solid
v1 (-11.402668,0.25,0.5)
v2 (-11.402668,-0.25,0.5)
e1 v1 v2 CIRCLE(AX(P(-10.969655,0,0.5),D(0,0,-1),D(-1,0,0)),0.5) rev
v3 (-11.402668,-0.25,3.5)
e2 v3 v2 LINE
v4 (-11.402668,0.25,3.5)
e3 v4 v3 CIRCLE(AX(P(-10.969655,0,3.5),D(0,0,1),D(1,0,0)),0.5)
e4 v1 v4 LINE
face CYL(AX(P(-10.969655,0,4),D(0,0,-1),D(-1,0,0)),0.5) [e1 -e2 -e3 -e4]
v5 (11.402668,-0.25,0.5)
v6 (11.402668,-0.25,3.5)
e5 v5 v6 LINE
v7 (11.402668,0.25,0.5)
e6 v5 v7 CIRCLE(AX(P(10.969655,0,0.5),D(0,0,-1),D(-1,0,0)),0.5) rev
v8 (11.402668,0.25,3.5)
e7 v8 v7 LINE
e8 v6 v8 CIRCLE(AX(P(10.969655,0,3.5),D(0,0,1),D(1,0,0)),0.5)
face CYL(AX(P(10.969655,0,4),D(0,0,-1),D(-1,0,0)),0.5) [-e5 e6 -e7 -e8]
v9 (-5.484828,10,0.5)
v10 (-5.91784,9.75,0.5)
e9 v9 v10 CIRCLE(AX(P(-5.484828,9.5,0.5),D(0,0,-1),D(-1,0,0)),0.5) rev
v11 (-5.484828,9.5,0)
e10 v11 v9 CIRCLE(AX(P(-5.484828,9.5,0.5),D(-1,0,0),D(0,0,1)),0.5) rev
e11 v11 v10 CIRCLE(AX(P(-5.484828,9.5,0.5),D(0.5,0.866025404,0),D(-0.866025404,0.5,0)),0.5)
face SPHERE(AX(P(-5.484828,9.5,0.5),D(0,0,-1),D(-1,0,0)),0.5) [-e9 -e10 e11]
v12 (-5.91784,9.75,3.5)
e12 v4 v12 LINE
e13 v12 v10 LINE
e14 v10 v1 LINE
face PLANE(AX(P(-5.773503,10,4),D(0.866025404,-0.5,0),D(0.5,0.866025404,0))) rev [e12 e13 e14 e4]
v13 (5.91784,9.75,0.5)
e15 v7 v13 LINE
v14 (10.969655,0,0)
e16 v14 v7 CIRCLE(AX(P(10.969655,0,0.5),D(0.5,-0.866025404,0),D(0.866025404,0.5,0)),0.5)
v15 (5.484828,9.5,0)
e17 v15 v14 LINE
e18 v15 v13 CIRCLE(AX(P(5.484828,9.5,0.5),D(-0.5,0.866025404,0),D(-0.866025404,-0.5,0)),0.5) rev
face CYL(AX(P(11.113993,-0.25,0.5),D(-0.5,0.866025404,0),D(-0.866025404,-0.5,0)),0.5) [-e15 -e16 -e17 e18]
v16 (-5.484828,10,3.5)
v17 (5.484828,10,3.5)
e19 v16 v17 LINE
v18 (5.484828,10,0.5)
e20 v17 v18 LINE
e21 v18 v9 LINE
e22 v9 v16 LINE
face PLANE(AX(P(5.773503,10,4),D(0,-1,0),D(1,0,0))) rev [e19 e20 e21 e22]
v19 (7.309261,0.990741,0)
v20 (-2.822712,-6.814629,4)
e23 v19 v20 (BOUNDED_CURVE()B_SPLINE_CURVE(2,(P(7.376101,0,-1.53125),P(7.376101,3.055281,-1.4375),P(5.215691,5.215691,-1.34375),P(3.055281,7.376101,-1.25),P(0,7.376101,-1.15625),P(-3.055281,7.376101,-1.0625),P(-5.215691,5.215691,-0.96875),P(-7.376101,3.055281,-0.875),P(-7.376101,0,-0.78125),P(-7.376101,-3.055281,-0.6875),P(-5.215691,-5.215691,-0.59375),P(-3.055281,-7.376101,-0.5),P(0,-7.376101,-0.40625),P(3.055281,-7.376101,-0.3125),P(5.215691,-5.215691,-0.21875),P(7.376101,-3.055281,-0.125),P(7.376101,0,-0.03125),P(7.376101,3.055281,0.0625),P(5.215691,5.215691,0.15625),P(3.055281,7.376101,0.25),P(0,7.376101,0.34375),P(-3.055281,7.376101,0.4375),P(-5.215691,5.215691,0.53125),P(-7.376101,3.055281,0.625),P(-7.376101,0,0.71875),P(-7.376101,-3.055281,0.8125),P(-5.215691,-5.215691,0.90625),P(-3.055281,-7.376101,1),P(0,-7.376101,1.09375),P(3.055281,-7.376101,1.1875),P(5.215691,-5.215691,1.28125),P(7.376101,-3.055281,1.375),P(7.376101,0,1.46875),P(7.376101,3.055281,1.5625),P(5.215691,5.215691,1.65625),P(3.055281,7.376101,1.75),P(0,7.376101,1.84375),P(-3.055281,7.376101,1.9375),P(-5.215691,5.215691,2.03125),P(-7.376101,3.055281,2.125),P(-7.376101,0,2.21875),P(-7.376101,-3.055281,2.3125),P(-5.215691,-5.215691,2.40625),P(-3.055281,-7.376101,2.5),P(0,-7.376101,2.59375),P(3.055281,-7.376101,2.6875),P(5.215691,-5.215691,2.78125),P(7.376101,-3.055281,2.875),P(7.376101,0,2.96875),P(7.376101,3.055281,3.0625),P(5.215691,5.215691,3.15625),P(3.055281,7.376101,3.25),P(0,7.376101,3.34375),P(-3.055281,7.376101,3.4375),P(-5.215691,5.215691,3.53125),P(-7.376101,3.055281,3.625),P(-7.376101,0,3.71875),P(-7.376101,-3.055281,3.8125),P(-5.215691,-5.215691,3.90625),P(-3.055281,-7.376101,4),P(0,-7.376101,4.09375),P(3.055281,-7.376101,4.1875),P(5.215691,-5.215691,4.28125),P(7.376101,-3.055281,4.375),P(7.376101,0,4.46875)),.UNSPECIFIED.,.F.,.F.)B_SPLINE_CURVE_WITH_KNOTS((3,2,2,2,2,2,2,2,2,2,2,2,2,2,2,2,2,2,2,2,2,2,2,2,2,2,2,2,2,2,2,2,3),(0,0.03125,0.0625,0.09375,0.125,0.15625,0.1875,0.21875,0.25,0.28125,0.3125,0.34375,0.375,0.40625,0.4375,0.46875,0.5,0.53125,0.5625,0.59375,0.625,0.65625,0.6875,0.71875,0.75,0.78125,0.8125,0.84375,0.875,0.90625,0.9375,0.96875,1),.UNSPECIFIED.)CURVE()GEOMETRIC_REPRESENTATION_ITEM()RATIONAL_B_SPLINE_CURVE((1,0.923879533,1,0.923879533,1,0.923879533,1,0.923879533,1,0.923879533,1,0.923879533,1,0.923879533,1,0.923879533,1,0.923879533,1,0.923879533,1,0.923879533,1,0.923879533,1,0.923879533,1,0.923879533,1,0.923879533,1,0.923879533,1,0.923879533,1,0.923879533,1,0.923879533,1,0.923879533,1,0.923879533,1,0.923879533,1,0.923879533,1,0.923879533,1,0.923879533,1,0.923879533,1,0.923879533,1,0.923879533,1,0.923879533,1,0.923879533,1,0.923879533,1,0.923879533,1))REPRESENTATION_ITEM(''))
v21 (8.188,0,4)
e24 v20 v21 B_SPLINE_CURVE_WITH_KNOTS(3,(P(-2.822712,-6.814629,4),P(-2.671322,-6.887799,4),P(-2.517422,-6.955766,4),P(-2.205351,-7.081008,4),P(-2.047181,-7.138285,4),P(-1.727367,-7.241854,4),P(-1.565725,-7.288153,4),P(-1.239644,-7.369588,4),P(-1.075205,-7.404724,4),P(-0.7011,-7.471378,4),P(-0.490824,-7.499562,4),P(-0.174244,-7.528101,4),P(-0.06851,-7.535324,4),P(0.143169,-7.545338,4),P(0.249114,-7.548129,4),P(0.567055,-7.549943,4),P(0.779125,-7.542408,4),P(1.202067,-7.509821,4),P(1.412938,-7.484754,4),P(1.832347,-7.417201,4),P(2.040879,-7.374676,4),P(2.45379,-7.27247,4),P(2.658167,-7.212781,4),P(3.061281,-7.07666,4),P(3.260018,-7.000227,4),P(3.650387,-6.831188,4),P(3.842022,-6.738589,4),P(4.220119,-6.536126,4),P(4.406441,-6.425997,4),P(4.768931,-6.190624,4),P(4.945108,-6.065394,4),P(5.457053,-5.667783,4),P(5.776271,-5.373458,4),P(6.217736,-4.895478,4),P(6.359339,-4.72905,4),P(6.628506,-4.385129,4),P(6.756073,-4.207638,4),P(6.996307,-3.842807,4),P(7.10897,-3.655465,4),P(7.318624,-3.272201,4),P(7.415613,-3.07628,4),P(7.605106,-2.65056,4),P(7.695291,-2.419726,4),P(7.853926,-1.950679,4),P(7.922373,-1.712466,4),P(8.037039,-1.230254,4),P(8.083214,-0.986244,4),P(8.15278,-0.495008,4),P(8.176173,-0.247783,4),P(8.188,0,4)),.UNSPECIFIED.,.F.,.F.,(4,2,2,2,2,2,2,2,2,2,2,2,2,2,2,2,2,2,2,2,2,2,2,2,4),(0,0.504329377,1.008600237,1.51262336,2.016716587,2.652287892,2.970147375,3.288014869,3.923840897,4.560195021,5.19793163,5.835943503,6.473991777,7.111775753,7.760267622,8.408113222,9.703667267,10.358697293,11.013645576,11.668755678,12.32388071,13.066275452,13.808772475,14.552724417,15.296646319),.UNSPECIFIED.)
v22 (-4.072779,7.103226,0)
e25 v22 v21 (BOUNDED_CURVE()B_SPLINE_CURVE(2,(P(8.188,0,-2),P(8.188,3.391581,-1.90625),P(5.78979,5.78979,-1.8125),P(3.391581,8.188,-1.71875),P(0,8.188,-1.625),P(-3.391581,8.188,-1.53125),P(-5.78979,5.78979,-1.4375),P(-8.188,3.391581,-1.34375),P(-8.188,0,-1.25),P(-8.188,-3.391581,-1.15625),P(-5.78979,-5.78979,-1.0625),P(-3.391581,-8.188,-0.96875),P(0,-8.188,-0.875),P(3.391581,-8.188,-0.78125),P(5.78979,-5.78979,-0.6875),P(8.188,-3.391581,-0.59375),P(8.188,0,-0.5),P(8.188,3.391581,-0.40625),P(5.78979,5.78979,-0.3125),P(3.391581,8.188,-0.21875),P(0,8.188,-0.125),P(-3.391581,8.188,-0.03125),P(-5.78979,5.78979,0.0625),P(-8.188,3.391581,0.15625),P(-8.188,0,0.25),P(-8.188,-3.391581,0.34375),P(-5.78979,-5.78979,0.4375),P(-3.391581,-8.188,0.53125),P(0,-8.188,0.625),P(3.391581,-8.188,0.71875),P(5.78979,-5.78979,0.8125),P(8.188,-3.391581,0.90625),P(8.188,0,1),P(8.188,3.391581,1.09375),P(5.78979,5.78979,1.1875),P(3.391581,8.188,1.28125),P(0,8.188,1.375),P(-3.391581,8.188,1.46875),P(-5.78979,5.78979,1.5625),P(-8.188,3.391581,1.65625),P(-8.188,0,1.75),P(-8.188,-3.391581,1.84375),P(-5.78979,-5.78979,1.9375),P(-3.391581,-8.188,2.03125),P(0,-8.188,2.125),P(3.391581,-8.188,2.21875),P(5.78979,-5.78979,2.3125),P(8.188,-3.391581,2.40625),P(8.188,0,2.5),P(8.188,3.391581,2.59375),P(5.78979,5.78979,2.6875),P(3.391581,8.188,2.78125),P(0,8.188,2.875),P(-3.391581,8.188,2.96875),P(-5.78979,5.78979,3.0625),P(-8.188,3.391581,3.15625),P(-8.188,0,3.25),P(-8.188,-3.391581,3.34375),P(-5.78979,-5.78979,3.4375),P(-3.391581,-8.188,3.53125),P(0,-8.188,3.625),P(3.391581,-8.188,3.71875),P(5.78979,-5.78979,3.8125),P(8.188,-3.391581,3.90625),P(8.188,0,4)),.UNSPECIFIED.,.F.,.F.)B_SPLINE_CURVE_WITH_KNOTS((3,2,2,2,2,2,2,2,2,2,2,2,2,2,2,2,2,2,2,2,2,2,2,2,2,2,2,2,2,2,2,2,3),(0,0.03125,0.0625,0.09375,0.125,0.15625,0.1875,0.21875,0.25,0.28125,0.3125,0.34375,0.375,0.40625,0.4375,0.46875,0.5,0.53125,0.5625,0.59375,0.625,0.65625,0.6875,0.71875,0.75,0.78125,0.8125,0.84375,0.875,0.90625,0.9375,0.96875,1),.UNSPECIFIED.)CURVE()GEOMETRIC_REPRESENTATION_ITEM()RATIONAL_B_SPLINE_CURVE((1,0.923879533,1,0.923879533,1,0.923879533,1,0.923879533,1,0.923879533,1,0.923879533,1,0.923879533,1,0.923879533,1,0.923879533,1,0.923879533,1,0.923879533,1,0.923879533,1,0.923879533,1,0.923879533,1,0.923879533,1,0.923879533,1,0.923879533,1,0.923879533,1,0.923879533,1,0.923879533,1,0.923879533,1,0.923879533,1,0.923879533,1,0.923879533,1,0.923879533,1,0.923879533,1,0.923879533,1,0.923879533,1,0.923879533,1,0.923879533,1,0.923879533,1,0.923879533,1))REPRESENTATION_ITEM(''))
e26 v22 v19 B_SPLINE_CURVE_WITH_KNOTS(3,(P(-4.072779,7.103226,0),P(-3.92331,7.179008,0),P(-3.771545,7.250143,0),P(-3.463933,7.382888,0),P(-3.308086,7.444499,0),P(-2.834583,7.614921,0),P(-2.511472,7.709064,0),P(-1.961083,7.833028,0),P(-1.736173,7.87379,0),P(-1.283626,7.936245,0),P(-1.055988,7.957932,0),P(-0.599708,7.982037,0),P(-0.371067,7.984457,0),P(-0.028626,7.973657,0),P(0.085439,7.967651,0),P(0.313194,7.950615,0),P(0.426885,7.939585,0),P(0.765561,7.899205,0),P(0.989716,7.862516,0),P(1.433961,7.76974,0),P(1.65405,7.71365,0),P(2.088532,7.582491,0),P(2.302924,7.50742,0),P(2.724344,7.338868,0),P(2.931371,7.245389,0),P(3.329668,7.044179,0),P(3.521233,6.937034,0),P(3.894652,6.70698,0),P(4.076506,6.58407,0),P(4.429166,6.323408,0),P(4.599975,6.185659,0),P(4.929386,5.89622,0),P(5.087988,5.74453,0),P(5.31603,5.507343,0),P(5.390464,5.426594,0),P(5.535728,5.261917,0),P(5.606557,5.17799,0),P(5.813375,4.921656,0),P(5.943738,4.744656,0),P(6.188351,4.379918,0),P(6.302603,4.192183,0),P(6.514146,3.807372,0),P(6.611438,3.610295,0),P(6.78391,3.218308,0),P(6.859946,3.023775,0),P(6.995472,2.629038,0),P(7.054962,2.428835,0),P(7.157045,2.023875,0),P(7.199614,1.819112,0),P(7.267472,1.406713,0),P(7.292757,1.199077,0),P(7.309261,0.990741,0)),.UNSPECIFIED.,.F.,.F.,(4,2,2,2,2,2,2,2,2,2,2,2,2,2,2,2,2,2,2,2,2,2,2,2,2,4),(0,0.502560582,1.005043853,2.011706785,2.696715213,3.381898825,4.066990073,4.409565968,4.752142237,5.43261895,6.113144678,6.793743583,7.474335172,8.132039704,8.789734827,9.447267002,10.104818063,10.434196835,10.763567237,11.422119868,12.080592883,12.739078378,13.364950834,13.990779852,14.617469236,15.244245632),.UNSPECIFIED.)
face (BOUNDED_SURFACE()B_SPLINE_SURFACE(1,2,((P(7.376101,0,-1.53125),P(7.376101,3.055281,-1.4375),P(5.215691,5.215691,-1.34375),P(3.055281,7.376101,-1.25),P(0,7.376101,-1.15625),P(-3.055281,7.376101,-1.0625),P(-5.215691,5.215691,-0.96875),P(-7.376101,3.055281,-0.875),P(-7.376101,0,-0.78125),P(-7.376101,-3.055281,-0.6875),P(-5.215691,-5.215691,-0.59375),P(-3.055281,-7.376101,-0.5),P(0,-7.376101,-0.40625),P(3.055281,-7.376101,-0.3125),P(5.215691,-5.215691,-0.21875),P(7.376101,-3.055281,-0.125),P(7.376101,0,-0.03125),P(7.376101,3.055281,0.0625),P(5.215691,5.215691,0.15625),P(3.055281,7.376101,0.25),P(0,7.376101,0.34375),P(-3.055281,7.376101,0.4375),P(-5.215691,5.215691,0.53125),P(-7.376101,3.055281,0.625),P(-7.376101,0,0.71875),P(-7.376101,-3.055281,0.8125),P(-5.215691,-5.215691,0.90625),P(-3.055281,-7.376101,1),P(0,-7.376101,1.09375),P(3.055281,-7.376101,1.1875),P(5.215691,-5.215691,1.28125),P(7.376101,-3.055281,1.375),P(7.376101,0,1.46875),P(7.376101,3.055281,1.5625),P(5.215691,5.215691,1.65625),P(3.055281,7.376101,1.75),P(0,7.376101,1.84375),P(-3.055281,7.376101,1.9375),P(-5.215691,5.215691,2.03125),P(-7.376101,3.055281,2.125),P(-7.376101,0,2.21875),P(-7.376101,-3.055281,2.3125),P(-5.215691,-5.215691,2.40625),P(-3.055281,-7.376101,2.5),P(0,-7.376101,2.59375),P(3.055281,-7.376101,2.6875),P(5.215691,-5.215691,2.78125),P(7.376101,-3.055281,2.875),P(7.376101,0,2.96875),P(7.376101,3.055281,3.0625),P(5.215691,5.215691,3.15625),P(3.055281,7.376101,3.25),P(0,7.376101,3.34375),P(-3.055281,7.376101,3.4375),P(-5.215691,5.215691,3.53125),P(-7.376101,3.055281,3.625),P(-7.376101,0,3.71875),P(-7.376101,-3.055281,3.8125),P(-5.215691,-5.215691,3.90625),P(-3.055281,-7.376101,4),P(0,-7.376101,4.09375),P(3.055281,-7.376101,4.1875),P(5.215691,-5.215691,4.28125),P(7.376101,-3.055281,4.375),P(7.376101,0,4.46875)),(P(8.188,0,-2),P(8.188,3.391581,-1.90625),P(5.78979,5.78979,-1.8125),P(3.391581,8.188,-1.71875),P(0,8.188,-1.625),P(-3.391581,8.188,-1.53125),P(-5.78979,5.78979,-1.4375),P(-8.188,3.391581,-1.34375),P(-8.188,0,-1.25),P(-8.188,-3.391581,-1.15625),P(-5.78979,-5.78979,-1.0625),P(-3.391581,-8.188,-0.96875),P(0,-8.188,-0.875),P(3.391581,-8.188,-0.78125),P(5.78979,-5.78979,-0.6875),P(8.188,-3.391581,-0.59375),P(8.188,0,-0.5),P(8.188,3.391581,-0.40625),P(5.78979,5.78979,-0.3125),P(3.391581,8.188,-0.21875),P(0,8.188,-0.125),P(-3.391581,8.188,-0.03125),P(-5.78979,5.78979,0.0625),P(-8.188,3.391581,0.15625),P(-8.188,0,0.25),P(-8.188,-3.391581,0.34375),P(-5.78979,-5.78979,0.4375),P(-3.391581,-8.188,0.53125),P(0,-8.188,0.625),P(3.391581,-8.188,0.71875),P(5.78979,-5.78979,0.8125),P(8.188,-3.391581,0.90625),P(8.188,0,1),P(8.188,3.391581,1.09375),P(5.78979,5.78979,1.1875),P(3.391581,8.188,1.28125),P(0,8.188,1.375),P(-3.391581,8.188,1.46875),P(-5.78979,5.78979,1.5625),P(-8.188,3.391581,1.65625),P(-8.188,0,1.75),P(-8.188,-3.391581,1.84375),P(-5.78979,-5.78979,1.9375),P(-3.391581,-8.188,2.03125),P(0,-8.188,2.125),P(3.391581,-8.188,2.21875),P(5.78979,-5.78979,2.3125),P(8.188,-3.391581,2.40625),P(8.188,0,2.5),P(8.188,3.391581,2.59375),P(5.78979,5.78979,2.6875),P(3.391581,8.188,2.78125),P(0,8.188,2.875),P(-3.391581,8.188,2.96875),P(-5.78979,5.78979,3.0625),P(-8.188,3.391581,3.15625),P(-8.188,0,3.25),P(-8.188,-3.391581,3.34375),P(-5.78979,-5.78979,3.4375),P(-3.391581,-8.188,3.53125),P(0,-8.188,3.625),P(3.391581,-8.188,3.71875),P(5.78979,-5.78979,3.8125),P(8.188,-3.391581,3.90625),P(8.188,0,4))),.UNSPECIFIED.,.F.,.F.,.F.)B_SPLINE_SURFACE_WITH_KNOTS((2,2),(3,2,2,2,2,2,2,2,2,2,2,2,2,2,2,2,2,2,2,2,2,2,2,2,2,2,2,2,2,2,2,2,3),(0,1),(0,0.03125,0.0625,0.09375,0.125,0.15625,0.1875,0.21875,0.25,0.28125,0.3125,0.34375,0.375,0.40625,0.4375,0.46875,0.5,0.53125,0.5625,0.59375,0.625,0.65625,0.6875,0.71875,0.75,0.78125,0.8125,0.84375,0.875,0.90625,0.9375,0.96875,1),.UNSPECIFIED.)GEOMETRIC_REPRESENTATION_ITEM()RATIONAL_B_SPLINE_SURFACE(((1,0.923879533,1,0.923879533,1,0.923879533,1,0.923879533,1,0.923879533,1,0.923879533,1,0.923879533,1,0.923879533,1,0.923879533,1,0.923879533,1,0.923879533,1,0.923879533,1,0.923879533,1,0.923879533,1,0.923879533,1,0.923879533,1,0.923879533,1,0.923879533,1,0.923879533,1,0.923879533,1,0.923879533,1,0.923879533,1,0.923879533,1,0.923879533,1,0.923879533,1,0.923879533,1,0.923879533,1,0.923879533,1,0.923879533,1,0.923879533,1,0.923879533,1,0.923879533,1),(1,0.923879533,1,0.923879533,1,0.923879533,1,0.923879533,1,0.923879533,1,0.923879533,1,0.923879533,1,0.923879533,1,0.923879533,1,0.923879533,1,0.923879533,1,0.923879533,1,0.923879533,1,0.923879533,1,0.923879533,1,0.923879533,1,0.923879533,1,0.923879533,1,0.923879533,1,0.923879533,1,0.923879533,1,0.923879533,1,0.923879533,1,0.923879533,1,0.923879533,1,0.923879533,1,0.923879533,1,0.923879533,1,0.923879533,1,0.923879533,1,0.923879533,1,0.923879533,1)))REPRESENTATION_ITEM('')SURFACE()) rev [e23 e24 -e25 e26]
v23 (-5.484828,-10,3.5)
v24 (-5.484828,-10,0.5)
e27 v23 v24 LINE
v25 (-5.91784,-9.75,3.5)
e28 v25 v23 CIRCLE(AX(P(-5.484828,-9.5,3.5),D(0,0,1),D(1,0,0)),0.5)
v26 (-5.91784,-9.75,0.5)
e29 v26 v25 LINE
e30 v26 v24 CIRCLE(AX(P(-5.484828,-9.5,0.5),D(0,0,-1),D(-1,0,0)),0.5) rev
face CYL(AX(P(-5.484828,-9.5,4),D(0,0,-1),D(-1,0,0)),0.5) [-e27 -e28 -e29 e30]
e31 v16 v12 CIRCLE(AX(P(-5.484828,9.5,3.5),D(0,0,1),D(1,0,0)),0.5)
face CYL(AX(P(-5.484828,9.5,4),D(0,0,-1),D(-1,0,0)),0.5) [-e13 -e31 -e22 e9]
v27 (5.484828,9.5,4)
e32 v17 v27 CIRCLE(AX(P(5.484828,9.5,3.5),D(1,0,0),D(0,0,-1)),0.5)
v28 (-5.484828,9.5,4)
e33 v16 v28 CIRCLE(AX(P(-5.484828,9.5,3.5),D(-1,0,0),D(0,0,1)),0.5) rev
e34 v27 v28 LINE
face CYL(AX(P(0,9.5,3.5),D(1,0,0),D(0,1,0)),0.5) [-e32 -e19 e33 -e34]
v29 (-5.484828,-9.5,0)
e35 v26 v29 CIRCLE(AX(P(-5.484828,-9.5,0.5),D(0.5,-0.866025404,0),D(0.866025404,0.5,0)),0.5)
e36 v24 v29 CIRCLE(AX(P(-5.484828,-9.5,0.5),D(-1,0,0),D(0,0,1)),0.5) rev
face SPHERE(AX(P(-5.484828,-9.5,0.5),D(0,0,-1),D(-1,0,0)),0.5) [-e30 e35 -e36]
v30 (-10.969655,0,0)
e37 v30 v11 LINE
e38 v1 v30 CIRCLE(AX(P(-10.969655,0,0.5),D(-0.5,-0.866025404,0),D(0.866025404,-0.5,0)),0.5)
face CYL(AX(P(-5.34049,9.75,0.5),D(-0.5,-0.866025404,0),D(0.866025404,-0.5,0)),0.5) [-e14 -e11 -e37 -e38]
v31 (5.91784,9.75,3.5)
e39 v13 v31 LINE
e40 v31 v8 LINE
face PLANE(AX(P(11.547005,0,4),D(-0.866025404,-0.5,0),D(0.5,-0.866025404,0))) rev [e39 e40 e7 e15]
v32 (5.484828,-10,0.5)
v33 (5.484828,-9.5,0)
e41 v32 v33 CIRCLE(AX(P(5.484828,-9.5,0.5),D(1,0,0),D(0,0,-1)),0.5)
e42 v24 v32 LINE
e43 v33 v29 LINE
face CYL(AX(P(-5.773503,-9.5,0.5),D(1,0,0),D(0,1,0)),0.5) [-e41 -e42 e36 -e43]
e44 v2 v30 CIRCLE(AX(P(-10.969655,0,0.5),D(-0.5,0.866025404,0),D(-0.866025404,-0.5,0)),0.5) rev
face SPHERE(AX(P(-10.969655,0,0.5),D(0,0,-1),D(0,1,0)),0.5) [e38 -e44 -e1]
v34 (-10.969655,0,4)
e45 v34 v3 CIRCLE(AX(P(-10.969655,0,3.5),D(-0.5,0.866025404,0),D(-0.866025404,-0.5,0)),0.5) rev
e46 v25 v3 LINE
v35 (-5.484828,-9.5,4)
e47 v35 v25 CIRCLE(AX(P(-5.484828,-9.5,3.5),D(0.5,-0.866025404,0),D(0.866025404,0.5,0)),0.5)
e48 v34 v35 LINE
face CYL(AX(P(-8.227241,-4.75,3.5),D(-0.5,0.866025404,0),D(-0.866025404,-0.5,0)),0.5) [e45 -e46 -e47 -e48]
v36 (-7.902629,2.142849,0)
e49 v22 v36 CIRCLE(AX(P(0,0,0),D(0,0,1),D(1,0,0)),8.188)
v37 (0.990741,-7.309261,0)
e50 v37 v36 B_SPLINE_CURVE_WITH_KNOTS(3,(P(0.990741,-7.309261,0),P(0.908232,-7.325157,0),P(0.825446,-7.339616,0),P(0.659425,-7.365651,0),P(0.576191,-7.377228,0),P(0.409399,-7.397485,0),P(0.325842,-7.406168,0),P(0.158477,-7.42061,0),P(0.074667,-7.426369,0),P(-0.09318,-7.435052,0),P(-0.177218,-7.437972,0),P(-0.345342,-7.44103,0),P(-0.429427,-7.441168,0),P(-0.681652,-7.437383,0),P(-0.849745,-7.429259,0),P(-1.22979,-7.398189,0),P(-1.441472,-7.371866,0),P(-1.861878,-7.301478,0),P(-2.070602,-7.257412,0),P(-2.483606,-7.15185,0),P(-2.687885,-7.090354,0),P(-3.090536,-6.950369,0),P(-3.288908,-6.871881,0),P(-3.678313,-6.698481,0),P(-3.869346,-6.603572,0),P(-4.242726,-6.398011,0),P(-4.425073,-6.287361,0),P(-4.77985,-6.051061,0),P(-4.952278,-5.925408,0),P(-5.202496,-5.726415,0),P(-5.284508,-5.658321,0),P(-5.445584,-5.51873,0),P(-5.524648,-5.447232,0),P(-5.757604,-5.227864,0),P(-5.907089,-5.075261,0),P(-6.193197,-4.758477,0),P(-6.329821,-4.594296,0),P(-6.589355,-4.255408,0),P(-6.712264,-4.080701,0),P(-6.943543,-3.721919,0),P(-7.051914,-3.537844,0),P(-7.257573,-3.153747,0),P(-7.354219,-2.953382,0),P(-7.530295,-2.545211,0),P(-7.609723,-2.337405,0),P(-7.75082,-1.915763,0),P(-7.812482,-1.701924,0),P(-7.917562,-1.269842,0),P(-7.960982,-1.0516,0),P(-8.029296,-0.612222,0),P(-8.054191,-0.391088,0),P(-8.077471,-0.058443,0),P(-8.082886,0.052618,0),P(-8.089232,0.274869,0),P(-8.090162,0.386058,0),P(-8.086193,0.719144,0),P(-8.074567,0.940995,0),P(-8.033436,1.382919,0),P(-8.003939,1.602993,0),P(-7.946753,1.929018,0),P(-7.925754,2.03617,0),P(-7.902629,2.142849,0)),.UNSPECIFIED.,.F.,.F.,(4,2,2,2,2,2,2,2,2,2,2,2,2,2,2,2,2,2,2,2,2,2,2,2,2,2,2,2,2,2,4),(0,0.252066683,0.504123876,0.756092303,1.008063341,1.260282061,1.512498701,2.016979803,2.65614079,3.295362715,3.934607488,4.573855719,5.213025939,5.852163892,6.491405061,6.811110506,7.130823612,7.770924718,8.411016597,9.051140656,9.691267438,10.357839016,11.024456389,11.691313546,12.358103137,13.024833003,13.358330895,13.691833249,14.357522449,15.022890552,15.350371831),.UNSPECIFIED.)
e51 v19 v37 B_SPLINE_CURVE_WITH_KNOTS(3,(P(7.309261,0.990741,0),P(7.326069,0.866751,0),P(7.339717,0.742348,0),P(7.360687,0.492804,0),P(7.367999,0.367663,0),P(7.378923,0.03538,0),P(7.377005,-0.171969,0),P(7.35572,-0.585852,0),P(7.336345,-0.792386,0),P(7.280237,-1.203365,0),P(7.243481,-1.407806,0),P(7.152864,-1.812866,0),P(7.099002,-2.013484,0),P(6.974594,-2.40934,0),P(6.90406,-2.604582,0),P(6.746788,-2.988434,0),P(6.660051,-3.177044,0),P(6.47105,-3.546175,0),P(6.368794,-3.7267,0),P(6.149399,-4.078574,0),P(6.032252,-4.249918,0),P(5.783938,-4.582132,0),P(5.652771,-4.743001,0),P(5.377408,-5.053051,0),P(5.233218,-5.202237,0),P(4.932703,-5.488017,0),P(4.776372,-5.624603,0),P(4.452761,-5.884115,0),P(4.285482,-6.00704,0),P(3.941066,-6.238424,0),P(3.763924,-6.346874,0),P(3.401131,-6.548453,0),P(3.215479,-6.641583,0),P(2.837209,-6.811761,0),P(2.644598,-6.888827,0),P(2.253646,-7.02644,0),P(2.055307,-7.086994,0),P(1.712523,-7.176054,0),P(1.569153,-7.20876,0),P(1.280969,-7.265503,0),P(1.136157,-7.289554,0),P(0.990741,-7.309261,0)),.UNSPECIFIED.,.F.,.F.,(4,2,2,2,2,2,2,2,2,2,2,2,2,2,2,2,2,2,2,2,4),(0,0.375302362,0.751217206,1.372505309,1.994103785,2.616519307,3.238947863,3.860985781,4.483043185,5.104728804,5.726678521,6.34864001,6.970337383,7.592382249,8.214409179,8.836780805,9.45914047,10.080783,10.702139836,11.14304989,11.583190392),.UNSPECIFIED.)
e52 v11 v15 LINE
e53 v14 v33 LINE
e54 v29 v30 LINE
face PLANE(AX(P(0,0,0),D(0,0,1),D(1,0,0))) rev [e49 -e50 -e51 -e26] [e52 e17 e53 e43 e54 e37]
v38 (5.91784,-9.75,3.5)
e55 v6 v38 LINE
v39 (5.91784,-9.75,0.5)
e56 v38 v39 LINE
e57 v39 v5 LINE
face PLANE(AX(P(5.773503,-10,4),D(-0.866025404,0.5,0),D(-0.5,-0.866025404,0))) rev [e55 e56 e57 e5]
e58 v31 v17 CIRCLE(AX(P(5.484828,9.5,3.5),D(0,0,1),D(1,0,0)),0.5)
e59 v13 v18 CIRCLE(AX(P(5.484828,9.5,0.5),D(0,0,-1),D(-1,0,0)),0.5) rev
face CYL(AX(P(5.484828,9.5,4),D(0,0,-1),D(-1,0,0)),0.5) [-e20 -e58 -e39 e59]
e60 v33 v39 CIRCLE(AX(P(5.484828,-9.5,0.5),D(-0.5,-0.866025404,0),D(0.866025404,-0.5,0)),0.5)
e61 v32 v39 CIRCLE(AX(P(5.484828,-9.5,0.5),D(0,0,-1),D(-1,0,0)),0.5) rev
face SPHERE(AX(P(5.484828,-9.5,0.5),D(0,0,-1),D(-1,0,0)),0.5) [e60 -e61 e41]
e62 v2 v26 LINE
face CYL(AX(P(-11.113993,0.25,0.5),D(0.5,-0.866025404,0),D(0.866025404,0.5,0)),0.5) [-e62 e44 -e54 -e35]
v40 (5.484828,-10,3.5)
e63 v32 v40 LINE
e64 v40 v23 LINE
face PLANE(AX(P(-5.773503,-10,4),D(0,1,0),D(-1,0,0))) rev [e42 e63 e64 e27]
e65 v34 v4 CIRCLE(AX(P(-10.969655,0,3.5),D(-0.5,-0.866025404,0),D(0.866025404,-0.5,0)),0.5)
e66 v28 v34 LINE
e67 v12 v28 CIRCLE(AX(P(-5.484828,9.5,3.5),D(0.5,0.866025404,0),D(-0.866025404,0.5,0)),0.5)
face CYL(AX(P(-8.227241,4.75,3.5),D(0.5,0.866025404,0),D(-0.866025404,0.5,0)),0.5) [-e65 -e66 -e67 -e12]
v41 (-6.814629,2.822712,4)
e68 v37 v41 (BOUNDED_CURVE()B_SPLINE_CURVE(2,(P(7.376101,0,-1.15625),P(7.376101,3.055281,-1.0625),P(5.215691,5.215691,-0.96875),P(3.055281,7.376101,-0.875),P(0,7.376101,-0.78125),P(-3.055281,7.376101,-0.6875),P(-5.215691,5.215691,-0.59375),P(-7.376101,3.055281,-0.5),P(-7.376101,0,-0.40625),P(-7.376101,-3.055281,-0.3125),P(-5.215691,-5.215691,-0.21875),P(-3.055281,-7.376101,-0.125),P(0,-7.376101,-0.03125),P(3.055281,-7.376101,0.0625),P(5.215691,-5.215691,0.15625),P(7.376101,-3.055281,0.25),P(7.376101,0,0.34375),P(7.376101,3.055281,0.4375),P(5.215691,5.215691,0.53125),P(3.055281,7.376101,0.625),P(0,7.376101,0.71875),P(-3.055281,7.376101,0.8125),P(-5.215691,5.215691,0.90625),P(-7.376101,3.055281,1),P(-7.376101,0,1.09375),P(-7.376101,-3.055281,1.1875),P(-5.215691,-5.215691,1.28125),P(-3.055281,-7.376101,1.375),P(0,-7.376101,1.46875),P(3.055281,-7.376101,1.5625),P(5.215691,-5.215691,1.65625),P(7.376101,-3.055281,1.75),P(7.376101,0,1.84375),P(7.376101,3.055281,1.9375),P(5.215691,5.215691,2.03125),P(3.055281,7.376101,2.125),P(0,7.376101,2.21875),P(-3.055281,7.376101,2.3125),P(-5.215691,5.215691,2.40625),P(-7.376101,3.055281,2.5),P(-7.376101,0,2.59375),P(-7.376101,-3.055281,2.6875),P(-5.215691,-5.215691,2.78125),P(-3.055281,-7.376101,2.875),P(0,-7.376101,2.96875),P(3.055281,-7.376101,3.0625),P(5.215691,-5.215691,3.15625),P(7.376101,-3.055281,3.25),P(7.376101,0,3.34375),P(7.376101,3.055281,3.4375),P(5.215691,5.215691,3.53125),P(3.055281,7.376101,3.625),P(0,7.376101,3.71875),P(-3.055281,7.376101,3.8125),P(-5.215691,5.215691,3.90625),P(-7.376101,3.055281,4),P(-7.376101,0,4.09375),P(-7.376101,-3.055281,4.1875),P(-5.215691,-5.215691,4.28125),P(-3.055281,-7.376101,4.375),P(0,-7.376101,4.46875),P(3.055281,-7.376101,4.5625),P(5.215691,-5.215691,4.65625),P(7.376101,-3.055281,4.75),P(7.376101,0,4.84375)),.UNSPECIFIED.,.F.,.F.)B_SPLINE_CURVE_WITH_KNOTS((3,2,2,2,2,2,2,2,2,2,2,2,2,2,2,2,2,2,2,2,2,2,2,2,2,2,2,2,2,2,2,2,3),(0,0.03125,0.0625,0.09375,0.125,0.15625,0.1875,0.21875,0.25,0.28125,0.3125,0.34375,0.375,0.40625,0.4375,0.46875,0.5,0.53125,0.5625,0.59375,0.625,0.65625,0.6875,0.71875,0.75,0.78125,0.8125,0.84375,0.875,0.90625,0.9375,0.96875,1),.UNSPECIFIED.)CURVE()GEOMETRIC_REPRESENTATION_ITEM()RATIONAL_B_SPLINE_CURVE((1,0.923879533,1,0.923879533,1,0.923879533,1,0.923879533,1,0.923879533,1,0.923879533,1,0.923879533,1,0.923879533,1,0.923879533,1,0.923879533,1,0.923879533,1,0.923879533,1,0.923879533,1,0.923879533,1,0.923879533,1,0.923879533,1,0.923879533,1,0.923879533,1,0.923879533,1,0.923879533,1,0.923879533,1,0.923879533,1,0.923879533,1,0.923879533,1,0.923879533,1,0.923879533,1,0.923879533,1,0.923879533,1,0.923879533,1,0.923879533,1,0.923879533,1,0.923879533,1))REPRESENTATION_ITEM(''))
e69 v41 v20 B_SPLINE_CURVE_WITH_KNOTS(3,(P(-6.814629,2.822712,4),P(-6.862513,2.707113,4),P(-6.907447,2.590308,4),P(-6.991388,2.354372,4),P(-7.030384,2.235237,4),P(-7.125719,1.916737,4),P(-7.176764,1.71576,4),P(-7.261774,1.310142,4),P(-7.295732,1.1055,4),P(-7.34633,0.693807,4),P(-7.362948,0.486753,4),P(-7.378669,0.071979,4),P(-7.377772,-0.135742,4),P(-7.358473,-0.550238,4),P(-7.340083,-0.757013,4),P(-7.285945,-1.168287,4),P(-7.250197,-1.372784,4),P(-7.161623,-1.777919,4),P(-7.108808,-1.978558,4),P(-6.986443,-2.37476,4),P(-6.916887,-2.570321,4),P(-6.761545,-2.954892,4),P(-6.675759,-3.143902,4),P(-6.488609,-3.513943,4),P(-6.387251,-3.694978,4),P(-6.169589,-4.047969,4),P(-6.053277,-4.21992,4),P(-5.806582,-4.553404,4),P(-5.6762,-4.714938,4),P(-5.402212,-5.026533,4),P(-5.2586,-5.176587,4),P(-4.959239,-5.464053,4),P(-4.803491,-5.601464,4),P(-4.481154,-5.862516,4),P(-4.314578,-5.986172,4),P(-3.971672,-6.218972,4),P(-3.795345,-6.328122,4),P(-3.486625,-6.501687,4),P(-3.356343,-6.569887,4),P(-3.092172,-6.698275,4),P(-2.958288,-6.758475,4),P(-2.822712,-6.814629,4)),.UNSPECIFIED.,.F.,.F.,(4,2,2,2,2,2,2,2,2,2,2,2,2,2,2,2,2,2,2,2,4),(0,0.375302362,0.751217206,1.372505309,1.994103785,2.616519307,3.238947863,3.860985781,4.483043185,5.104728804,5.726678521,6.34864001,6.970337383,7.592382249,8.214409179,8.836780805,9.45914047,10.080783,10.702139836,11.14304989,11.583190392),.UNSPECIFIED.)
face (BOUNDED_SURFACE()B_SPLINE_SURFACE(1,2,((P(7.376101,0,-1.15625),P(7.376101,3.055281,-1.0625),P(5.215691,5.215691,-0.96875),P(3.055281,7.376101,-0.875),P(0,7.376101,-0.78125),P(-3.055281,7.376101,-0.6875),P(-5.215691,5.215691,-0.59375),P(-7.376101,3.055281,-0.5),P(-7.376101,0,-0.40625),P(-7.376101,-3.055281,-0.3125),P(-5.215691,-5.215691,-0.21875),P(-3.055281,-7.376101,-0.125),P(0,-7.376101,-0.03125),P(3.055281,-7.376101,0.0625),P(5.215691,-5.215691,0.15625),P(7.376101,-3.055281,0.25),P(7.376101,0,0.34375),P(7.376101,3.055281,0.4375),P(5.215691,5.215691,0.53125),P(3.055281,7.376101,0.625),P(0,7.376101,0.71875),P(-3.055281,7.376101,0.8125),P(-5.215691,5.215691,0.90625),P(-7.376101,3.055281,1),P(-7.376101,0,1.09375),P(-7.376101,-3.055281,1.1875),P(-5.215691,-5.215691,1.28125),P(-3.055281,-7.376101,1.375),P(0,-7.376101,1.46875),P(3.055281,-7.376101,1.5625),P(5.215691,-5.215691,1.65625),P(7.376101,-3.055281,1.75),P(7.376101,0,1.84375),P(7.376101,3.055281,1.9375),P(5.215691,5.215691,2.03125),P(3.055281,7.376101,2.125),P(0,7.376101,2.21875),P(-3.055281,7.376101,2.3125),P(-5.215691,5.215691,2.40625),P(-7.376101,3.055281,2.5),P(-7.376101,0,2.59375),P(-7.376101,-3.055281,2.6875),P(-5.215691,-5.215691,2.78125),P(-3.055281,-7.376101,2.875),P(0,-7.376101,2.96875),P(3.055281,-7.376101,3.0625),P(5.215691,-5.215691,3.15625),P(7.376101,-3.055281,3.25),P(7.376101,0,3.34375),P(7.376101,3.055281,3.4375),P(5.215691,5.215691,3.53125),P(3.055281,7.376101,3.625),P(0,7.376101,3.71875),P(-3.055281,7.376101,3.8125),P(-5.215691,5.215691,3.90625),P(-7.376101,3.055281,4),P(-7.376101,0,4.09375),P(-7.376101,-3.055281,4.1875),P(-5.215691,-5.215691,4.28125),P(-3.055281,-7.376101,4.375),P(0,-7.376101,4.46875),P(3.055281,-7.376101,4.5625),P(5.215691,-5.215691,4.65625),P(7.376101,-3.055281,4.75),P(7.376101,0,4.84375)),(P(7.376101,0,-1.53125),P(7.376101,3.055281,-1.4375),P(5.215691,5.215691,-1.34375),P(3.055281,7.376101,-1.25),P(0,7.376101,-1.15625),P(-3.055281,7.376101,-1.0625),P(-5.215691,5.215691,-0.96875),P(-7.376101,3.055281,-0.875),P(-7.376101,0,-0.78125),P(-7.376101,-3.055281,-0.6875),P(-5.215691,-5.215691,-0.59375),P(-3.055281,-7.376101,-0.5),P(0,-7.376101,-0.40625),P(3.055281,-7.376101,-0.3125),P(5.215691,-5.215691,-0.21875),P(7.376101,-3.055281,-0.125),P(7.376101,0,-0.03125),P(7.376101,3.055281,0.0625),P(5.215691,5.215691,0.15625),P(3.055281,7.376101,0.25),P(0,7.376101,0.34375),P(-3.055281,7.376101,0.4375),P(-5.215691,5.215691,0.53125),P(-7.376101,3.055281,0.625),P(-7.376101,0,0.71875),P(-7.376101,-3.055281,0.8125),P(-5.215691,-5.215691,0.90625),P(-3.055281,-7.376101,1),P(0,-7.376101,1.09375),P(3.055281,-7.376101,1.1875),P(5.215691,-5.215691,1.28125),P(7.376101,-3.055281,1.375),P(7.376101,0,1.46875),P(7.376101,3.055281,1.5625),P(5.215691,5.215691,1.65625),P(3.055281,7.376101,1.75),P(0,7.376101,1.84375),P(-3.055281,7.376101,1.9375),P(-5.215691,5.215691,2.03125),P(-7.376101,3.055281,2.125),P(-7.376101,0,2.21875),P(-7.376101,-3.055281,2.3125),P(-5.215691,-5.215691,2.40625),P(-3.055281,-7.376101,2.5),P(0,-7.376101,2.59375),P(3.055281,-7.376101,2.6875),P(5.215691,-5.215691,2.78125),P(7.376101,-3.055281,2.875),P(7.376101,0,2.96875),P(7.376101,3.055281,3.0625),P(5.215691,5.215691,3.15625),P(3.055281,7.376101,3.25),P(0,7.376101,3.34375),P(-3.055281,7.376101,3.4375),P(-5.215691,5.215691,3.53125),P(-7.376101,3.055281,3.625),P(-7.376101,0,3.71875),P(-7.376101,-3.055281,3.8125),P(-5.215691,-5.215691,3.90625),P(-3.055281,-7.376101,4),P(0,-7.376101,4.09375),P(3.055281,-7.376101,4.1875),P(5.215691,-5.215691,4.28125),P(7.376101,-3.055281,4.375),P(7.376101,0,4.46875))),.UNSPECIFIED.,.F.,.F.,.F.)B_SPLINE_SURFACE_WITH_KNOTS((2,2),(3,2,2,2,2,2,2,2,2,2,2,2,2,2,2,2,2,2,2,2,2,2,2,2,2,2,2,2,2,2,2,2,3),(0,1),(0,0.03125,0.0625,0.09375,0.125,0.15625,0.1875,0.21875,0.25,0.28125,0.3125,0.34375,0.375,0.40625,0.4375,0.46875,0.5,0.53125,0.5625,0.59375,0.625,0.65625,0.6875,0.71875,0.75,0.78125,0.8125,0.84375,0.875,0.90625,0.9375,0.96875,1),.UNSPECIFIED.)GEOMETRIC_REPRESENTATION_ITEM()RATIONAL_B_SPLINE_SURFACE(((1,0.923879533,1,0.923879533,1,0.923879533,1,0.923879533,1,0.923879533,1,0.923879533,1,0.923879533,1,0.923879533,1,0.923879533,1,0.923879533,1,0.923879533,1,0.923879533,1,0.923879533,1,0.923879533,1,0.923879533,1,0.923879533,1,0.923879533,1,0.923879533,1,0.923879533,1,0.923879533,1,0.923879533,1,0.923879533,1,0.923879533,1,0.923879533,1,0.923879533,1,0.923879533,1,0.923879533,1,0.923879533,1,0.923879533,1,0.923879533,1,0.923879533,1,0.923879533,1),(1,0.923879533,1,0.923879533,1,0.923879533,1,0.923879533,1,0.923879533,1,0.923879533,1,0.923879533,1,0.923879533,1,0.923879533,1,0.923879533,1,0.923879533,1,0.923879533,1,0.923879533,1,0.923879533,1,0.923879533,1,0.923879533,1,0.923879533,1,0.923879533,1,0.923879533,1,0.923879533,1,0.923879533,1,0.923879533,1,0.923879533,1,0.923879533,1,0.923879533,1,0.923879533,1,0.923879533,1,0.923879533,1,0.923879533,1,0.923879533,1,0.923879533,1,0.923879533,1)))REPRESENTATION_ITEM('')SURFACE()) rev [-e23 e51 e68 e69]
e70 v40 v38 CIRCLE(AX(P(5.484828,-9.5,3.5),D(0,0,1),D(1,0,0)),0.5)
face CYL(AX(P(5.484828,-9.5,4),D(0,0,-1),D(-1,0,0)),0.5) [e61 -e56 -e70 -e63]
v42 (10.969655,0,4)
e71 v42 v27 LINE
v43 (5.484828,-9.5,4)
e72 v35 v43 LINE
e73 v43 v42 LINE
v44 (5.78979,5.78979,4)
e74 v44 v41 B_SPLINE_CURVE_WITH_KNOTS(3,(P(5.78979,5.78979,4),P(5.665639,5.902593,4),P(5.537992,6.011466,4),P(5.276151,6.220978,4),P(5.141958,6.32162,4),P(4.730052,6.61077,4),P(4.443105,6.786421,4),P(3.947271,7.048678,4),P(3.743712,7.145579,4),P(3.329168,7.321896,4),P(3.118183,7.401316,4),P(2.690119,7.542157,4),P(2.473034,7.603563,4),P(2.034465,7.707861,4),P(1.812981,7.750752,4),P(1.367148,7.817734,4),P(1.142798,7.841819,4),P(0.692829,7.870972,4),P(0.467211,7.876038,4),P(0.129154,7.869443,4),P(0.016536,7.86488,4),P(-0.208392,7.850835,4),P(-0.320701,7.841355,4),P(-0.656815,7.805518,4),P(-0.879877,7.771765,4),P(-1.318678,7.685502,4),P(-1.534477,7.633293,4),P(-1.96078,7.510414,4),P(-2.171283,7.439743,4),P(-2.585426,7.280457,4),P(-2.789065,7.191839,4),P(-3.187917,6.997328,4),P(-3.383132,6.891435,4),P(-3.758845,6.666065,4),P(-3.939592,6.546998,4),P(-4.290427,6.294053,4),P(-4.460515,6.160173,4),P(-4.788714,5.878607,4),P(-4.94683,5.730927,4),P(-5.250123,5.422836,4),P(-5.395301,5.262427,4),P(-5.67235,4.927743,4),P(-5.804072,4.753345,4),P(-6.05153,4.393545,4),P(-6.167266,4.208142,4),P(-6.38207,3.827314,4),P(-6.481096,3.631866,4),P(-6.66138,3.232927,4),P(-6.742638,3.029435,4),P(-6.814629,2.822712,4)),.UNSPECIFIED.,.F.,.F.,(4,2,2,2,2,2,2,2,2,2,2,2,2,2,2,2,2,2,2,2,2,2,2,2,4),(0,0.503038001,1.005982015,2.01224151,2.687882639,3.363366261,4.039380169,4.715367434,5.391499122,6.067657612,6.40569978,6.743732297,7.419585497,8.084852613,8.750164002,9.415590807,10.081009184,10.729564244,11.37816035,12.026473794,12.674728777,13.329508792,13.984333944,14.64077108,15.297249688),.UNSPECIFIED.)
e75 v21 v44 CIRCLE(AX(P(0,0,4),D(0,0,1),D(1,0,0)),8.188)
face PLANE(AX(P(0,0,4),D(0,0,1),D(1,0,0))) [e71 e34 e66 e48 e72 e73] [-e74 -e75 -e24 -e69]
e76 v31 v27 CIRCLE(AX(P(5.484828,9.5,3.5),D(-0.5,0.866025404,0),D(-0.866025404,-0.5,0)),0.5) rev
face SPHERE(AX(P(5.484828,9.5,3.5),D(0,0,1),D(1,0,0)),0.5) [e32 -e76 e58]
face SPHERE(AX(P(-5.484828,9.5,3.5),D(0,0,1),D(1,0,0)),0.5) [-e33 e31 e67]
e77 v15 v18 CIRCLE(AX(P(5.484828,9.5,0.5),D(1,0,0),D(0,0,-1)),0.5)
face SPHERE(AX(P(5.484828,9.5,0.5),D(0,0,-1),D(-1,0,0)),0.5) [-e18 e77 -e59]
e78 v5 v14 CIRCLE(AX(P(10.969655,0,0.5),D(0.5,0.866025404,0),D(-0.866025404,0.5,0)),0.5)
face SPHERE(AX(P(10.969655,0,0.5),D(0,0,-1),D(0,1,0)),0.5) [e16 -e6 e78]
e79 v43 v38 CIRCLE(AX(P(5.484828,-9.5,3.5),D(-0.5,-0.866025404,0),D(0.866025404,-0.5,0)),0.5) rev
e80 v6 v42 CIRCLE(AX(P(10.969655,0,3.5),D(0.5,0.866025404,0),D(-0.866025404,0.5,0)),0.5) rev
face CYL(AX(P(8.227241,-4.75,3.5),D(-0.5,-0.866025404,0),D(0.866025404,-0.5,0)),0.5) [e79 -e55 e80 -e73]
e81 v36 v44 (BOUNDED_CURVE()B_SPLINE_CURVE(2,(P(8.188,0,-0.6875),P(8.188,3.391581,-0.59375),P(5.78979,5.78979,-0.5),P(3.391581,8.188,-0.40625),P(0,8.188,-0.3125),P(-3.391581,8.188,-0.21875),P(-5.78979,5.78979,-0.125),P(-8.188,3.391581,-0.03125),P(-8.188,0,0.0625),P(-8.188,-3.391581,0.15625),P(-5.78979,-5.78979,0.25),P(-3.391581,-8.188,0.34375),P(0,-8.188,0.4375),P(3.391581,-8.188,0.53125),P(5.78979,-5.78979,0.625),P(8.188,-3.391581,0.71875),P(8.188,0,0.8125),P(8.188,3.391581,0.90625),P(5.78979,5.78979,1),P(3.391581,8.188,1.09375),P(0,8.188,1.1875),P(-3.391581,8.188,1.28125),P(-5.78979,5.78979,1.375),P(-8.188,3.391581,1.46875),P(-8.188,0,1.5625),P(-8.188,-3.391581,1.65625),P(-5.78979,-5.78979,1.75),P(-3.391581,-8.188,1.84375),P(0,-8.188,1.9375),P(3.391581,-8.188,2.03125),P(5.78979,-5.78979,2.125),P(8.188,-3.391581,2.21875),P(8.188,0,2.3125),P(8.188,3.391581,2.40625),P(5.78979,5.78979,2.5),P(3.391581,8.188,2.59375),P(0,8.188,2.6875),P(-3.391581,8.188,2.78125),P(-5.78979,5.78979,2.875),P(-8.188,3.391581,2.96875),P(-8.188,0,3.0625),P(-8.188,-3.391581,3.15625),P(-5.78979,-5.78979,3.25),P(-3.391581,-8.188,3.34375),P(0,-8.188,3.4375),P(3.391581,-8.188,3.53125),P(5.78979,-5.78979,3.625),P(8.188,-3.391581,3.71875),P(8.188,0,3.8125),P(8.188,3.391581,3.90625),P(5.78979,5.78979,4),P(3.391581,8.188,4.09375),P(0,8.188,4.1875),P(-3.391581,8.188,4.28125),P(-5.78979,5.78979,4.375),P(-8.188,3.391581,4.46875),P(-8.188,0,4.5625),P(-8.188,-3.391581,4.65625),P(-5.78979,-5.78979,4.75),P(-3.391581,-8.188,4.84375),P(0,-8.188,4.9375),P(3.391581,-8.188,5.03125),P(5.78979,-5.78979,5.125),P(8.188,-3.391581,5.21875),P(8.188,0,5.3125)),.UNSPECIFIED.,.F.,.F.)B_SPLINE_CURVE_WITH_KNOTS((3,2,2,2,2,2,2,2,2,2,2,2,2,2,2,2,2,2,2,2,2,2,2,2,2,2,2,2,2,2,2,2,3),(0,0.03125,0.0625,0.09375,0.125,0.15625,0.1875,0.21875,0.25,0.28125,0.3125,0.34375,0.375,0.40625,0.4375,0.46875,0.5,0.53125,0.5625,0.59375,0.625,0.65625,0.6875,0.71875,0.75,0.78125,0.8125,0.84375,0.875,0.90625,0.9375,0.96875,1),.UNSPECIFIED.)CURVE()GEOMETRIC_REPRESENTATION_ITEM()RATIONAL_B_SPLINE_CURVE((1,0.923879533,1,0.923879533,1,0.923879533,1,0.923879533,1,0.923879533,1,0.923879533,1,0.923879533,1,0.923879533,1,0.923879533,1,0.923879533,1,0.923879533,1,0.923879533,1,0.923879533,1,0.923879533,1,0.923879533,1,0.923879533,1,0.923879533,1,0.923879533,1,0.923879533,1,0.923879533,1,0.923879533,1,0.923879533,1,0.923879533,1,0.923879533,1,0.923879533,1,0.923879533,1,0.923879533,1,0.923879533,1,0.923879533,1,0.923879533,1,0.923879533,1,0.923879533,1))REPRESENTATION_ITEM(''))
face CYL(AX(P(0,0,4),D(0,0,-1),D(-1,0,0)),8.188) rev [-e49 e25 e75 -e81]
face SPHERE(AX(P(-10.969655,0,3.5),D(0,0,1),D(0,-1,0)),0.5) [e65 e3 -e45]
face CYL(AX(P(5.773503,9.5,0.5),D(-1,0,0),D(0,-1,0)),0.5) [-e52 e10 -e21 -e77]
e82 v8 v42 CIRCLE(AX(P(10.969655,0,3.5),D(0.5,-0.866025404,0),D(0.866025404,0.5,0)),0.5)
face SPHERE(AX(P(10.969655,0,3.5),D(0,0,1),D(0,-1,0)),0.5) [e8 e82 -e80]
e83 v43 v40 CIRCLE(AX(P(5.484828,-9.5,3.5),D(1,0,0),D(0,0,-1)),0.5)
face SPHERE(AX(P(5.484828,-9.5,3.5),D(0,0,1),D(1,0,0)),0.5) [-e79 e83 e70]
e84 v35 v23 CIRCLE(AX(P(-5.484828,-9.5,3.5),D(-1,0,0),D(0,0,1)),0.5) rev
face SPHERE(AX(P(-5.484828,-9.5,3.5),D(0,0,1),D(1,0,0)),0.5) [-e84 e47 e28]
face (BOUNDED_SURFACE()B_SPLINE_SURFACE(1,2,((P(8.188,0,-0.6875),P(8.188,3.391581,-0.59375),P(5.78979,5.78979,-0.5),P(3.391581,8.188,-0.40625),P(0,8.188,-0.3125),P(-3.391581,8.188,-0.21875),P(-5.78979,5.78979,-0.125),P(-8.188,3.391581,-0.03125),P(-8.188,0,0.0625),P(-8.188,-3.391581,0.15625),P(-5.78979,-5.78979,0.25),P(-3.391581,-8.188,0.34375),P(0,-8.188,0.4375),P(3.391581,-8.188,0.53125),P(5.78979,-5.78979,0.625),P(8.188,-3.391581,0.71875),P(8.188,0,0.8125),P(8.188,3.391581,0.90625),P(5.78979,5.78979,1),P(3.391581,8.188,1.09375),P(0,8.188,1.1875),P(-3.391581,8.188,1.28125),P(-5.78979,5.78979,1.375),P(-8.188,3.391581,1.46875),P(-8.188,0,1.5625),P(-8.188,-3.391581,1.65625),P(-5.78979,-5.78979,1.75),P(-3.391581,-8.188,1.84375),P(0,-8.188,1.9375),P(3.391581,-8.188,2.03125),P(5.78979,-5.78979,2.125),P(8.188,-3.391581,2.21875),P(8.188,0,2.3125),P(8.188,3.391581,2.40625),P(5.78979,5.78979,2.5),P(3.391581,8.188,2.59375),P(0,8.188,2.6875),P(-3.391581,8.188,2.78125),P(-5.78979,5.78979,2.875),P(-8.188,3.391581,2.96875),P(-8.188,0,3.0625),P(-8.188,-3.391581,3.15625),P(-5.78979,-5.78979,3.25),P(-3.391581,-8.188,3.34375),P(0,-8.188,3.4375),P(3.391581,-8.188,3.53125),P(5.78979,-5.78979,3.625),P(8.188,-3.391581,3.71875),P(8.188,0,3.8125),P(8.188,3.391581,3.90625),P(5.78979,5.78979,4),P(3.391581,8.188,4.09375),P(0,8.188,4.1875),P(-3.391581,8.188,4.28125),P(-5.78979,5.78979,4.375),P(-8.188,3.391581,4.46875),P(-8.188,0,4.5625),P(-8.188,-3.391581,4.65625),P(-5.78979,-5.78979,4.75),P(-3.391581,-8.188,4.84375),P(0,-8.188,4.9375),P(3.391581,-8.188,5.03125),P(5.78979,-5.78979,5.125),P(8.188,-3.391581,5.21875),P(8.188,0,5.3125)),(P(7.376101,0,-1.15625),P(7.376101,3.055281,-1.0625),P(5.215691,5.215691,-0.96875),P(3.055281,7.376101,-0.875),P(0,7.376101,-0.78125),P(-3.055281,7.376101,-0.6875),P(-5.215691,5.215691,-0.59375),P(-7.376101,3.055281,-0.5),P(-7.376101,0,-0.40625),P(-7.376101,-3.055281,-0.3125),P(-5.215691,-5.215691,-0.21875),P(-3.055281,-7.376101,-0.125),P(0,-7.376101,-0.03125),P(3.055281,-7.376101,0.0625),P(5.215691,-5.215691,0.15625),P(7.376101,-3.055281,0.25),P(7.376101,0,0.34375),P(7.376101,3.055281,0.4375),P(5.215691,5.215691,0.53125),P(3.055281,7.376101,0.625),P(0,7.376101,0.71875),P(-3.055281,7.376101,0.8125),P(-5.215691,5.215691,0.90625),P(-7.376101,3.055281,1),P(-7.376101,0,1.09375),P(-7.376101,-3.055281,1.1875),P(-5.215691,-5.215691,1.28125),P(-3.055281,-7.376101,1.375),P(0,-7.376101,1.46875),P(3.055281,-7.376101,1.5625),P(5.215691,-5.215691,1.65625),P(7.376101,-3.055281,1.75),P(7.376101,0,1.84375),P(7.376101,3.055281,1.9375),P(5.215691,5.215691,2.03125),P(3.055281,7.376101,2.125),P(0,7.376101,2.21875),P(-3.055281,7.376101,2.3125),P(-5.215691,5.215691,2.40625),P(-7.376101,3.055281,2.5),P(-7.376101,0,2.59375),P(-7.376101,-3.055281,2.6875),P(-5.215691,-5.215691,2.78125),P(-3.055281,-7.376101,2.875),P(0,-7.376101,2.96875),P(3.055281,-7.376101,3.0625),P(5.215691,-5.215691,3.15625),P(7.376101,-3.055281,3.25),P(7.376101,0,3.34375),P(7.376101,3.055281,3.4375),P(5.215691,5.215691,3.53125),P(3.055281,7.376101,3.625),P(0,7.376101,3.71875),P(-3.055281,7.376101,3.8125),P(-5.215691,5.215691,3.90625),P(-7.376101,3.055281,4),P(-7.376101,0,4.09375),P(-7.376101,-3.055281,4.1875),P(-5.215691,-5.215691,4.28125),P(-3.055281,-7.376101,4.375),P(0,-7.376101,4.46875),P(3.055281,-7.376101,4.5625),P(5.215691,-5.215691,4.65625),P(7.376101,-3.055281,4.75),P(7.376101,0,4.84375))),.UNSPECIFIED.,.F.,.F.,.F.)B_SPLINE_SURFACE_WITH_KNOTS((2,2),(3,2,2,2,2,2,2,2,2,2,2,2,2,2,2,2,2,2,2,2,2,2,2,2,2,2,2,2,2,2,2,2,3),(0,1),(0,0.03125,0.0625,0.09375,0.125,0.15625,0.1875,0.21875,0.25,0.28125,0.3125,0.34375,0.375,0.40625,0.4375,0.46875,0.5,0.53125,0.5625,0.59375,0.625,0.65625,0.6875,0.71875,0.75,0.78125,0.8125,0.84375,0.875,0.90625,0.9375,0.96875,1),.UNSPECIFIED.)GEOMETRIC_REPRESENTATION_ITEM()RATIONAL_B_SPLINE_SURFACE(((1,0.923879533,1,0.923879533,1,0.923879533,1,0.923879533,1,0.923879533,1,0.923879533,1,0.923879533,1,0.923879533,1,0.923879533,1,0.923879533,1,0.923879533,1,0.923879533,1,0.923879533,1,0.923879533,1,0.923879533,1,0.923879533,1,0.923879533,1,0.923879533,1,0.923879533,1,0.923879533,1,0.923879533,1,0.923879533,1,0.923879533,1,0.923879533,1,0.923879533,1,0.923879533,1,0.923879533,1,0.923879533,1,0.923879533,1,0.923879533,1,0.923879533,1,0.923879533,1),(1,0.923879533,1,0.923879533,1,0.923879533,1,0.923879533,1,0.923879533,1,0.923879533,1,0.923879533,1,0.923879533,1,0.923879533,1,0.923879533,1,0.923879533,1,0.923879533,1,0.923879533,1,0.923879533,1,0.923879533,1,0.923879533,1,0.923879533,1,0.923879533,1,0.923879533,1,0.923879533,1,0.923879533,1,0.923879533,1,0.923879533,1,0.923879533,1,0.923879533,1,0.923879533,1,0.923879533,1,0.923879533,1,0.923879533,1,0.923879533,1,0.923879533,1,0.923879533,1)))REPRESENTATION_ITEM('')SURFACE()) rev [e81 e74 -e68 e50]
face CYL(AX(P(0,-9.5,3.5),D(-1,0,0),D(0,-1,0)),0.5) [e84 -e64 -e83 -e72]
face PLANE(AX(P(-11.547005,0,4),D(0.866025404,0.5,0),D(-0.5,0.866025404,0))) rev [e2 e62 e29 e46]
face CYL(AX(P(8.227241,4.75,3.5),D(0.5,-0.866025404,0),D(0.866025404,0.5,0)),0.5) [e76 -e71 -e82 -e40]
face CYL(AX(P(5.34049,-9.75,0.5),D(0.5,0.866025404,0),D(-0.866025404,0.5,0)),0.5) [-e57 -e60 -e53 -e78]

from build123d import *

# Parameters (mm, degrees)
SKIZZE1_R                       = 8.188
AUFSATZ_LINEAR_AUSTRAGEN1_DEPTH = 4
GEWINDE1_PITCH                  = 1.5
SKIZZE7_W                       = 5.280408975
SKIZZE7_H                       = 21.060699533
SKIZZE7_W_2                     = 5.818663971
SKIZZE7_H_2                     = 21.896441579
SCHNITT_LINEAR_AUSTRAGEN1_DEPTH = 26.720766668
VERRUNDUNG1_R                   = 0.5


with BuildPart() as part:
    # Skizze1 → Aufsatz-Linear austragen1 (new body)
    with BuildSketch(Plane.XY):
        Polygon((-11.547005384, 0), (-5.773502692, -10), (5.773502692, -10), (11.547005384, 0), (5.773502692, 10), (-5.773502692, 10), align=None)
        Circle(SKIZZE1_R, mode=Mode.SUBTRACT)
    extrude(amount=AUFSATZ_LINEAR_AUSTRAGEN1_DEPTH)

    # Gewinde1: the profile of Gewindeprofil1 profile screwed along a right-hand helix of 4 turns, 8 arcs to a turn; built about Z, then put on its axis
    gewinde1_z = Axis((0, 0, 0), (0, 0, 1))
    gewinde1_corners = [(8.1883, 0, -0.000173205), (8.1883, 0, 1.312673201), (7.376101188, 0, 0.843749998), (7.376101188, 0, 0.468749998)]
    with BuildLine(mode=Mode.PRIVATE) as gewinde1_profile:
        Line(gewinde1_corners[0], gewinde1_corners[1])
        Line(gewinde1_corners[1], gewinde1_corners[2])
        Line(gewinde1_corners[2], gewinde1_corners[3])
        Line(gewinde1_corners[3], gewinde1_corners[0])
    gewinde1_cap = Face(gewinde1_profile.wire())
    gewinde1_turn_angles = [0, 22.5, 45, 67.5, 90, 112.5, 135, 157.5, 180, 202.5, 225, 247.5, 270, 292.5, 315, 337.5, 360]
    gewinde1_turn_weights = [1, 0.9238795325112867, 1, 0.9238795325112867, 1, 0.9238795325112867, 1, 0.9238795325112867, 1, 0.9238795325112867, 1, 0.9238795325112867, 1, 0.9238795325112867, 1, 0.9238795325112867, 1]
    gewinde1_turn_rails = [Edge.make_bspline([Vector(p[0], p[1], 0).rotate(gewinde1_z, gewinde1_turn_angles[k]) / gewinde1_turn_weights[k] + Vector(0, 0, p[2] + GEWINDE1_PITCH * gewinde1_turn_angles[k] / 360) for k in range(17)], [0, 0, 0, 1, 1, 2, 2, 3, 3, 4, 4, 5, 5, 6, 6, 7, 7, 8, 8, 8], 2, gewinde1_turn_weights) for p in gewinde1_corners]
    gewinde1_turn_sides = [Face.make_surface_from_curves(gewinde1_turn_rails[p[0]], gewinde1_turn_rails[p[1]]) for p in [(0, 1), (1, 2), (2, 3), (3, 0)]]
    gewinde1 = Plane(origin=(0, 0, -2), x_dir=(1, 0, 0), z_dir=(0, 0, 1)) * Solid(Shell([*[p.moved(Location((0, 0, GEWINDE1_PITCH * i))) for i in range(4) for p in gewinde1_turn_sides], gewinde1_cap, gewinde1_cap.rotate(gewinde1_z, 1440).moved(Location((0, 0, GEWINDE1_PITCH * 1440 / 360)))]))
    add(gewinde1)

    # Skizze7 → Schnitt-Linear austragen1 (cut, through all)
    with BuildSketch(Plane(origin=(-8.660254038, 5, 0), x_dir=(0, 0, 1), z_dir=(-0.8660254037844415, 0.49999999999999517, 0))):
        with Locations((-2.640204488, 0.585019432)):
            Rectangle(SKIZZE7_W, SKIZZE7_H)
        with Locations((6.909331986, -0.222864546)):
            Rectangle(SKIZZE7_W_2, SKIZZE7_H_2)
    extrude(amount=-SCHNITT_LINEAR_AUSTRAGEN1_DEPTH, mode=Mode.SUBTRACT)

    # Verrundung1
    verrundung1_edges = [part.edges().sort_by_distance(p)[0] for p in [
        (-5.773502692, 10, 2),
        (5.773502692, 10, 2),
        (11.547005384, 0, 2),
        (5.773502692, -10, 2),
        (-5.773502692, -10, 2),
        (-11.547005384, 0, 2),
        (0, -10, 4),
        (8.660254038, -5, 4),
        (8.660254038, 5, 4),
        (0, 10, 4),
        (-8.660254038, 5, 4),
        (0, 10, 0),
        (8.660254038, 5, 0),
        (8.660254038, -5, 0),
        (0, -10, 0),
        (-8.660254038, -5, 0),
        (-8.660254038, 5, 0),
        (-8.660254038, -5, 4),
    ]]
    fillet(verrundung1_edges, radius=VERRUNDUNG1_R)


solid = part.part
